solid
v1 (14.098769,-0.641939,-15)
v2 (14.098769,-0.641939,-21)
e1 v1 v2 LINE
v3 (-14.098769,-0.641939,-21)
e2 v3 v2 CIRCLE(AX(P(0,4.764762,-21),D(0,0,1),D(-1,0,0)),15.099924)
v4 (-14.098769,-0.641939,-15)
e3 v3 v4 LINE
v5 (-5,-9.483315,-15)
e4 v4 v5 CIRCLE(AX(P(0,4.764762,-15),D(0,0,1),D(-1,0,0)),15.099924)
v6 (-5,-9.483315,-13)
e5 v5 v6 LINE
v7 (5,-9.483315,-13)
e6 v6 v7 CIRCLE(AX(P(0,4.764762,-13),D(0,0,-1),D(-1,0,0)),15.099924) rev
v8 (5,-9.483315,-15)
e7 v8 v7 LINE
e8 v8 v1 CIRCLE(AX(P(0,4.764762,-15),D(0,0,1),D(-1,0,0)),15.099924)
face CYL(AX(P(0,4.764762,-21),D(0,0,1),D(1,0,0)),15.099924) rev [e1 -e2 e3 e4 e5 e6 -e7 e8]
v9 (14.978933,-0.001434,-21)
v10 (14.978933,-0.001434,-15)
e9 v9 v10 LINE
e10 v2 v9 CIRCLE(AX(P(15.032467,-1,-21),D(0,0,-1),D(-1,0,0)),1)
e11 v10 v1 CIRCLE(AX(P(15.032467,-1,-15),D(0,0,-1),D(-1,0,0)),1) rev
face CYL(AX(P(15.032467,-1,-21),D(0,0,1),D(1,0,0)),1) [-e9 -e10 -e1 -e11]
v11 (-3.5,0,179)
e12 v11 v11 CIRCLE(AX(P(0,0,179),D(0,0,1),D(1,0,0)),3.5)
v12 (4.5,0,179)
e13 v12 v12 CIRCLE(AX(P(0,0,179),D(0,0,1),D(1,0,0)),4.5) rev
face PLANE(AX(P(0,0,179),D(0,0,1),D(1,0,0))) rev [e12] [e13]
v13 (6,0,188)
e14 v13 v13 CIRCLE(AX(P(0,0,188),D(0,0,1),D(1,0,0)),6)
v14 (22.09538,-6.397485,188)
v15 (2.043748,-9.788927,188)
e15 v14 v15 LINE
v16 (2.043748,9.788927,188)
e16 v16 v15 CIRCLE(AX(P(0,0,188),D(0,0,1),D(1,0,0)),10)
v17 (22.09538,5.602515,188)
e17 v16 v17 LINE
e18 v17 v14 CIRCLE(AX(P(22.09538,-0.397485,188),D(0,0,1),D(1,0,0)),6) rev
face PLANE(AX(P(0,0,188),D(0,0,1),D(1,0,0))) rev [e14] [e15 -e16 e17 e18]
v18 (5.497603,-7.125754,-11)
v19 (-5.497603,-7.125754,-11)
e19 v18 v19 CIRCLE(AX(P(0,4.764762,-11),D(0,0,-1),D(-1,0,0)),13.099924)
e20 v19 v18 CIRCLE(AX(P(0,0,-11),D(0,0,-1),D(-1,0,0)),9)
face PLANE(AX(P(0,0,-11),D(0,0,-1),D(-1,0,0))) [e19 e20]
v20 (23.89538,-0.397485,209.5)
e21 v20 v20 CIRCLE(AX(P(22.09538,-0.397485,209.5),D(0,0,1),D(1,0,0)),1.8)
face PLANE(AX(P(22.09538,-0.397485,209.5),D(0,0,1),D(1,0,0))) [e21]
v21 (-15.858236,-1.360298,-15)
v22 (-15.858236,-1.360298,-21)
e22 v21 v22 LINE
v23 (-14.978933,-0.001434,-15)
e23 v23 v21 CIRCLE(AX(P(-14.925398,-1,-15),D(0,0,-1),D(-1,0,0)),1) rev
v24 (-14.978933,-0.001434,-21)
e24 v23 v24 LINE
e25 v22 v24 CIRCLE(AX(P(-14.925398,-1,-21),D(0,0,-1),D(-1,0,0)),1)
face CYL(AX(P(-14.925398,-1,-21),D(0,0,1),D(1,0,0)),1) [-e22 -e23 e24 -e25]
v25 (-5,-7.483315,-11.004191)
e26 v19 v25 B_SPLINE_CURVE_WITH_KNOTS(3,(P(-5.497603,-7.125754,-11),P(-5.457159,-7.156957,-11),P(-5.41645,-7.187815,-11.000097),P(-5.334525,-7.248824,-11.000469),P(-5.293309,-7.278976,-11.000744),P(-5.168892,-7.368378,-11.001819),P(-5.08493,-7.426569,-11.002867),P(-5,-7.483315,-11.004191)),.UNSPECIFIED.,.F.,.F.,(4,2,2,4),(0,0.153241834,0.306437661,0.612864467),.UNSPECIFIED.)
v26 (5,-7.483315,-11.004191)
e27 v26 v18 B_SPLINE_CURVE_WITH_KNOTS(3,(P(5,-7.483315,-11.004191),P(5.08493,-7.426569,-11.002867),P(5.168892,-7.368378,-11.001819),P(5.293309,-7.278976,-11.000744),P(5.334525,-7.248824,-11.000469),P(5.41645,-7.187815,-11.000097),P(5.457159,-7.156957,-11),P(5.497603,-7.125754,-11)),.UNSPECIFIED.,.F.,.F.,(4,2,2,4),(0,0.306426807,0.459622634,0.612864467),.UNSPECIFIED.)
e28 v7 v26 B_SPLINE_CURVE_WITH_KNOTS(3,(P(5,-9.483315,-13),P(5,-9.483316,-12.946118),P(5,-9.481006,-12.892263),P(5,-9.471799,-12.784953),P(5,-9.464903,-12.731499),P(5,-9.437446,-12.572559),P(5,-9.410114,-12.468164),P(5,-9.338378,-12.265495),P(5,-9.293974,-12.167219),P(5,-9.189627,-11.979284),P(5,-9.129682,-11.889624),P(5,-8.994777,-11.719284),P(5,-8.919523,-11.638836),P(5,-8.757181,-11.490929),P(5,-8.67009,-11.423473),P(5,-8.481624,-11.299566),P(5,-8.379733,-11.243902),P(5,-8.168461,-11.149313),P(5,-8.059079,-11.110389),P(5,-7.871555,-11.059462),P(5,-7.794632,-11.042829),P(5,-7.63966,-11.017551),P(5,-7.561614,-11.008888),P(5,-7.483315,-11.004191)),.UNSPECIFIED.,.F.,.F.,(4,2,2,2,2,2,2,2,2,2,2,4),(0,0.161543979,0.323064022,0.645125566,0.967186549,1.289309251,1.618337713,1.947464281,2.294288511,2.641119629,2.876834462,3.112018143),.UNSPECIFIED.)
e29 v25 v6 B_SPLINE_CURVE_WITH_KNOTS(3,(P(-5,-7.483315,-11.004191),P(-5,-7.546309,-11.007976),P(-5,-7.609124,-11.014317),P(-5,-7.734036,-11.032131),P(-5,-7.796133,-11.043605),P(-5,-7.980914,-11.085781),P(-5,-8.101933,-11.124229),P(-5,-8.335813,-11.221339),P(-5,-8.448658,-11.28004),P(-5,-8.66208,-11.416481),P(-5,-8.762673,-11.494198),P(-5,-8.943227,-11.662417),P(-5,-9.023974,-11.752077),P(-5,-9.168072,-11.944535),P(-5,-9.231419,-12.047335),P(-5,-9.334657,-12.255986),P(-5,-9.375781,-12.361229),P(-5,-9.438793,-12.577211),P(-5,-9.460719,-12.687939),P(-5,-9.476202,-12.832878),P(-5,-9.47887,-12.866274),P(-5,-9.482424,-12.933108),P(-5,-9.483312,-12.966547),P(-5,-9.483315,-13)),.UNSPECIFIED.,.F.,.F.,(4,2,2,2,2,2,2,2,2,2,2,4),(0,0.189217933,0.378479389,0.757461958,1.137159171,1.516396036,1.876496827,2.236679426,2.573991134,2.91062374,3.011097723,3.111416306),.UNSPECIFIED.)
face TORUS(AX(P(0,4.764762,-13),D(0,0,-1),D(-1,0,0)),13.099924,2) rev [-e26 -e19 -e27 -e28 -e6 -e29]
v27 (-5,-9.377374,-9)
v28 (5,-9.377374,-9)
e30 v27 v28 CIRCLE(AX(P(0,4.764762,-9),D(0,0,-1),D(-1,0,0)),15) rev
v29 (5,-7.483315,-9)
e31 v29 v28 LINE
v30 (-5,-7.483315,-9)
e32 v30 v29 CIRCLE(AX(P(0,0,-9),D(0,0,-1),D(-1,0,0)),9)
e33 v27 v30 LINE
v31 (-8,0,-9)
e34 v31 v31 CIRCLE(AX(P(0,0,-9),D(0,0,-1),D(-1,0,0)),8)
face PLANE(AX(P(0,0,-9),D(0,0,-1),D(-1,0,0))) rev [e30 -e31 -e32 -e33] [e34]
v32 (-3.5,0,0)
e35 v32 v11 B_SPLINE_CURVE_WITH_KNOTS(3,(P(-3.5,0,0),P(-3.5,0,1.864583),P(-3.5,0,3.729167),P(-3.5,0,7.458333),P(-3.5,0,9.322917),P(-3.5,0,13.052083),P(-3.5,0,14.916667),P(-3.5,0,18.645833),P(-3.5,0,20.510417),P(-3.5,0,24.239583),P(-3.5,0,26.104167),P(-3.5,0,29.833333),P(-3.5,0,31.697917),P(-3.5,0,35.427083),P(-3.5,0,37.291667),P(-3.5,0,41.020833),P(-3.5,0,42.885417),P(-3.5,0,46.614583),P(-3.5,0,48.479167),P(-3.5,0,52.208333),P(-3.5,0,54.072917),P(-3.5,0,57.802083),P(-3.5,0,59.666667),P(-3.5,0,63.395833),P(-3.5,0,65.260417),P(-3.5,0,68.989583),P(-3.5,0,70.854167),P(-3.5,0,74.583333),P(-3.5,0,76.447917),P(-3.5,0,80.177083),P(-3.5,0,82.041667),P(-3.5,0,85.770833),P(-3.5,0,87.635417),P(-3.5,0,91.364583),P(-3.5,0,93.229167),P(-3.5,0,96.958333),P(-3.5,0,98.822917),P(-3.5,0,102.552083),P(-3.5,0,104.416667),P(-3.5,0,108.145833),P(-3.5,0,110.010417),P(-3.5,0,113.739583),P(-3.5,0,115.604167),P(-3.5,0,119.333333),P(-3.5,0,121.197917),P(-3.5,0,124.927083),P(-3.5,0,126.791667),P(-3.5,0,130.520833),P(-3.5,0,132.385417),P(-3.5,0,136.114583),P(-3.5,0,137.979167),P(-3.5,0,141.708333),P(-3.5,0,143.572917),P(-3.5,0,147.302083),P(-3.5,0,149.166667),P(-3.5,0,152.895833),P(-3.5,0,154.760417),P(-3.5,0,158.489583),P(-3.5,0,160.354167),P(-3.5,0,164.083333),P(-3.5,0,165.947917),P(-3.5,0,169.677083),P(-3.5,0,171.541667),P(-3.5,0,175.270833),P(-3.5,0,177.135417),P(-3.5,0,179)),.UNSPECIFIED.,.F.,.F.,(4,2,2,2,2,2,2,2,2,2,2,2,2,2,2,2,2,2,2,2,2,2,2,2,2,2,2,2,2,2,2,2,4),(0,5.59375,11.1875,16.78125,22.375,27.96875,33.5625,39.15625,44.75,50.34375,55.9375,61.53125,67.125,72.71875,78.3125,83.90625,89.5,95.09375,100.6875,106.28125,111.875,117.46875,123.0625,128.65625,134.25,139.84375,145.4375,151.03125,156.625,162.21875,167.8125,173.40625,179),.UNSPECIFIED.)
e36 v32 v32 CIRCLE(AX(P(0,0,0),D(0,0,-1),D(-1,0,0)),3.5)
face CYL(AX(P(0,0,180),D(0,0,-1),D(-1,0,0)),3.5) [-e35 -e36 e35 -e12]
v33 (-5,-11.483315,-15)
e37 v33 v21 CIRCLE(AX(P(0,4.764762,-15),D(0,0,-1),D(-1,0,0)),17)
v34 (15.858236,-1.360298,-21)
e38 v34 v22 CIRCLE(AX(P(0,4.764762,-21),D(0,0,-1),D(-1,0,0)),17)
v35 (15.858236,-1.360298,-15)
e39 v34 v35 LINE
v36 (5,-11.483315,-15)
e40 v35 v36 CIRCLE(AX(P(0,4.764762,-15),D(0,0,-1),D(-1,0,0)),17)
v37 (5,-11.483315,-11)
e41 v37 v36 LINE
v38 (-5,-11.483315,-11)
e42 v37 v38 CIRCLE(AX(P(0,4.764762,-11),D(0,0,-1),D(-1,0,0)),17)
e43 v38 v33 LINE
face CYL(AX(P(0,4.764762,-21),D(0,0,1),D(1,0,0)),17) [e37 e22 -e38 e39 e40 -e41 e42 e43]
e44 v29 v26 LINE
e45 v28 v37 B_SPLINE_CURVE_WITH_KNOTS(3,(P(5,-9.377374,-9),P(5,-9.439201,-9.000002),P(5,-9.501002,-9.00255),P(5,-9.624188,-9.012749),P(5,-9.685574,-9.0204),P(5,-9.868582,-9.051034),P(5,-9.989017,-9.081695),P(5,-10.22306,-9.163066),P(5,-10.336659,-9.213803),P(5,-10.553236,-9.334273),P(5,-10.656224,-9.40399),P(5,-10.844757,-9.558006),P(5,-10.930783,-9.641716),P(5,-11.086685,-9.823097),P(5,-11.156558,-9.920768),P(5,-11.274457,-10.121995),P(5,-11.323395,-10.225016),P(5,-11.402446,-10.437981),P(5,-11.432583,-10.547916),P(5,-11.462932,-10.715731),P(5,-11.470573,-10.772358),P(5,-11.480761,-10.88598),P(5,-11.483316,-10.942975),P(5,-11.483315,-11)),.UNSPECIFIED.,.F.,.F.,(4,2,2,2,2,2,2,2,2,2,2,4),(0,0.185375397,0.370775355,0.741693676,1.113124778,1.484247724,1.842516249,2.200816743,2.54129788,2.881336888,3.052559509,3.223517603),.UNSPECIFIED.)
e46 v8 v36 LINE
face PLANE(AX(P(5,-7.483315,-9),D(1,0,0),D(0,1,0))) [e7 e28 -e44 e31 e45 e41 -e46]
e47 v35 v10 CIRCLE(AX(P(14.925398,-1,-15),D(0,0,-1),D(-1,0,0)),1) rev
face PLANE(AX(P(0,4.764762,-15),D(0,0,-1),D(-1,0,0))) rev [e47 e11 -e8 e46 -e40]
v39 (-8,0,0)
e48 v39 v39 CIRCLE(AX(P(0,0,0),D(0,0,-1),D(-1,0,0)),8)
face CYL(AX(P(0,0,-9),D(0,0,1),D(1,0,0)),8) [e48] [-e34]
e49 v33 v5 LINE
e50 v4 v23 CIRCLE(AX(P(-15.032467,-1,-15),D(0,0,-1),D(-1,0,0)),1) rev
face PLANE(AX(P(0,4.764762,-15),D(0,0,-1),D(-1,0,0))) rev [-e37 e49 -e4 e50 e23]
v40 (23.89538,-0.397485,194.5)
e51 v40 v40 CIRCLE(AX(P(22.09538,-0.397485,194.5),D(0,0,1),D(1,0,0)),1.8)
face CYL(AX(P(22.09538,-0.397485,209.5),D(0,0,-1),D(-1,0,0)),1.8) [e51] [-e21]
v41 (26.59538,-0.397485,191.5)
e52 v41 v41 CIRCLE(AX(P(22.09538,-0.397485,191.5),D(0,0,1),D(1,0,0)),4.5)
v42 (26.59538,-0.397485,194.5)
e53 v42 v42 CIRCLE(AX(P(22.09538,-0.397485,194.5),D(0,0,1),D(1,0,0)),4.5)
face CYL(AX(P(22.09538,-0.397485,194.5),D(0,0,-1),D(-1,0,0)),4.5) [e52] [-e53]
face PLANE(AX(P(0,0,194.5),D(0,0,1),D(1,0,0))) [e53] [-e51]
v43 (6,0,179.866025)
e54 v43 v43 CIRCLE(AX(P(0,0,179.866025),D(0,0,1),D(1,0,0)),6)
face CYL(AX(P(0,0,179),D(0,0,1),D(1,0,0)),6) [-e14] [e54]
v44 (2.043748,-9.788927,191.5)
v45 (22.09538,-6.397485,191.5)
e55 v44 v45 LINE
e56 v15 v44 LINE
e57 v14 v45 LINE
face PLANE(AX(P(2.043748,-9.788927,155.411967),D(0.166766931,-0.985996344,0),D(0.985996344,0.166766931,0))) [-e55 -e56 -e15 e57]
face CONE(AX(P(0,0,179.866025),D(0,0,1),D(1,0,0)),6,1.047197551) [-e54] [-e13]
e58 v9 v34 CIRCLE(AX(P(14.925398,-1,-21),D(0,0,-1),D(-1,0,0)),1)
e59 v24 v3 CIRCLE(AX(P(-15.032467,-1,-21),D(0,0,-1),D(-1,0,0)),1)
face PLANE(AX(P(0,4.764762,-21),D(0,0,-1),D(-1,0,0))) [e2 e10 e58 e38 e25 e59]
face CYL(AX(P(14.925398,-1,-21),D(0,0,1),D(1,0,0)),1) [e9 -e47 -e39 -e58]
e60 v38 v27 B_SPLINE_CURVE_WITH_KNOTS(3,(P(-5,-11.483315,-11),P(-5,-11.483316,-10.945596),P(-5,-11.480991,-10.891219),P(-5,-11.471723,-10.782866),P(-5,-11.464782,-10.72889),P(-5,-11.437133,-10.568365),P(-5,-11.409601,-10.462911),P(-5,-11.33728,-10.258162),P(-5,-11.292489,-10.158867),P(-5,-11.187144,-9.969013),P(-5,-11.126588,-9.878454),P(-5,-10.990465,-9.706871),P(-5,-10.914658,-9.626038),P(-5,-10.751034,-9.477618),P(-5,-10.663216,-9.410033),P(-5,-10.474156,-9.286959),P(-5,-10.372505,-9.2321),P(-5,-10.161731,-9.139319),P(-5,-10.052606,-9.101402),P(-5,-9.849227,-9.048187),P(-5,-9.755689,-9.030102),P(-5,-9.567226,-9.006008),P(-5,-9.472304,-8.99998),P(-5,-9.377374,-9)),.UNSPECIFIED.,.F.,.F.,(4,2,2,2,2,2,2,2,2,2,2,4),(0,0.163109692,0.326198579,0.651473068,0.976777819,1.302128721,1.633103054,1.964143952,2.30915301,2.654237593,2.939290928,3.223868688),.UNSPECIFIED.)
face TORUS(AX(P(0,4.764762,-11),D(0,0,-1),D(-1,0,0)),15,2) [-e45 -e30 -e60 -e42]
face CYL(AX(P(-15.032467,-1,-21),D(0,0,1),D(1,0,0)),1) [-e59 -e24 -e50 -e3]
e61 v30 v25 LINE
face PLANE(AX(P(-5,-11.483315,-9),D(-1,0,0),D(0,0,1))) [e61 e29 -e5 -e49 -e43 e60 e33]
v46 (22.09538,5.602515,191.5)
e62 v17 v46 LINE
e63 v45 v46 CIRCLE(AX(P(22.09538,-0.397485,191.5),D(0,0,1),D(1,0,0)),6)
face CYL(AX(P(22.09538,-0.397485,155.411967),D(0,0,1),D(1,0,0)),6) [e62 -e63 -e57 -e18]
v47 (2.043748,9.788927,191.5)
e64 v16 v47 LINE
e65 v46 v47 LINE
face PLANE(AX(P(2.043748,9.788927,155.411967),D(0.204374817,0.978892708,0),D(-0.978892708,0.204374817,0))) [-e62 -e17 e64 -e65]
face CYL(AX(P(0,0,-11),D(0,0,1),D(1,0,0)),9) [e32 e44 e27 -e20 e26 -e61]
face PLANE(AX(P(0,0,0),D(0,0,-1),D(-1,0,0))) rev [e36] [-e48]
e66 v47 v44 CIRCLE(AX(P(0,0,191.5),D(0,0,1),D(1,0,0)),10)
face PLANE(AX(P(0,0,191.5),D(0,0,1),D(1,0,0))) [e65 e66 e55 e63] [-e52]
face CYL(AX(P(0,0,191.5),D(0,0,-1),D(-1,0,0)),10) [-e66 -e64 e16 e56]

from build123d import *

# Parameters (mm, degrees)
CROQUIS1_R                   = 3.5
SALIENTE_EXTRUIR1_DEPTH      = 180
SALIENTE_EXTRUIR2_DEPTH      = 8
SALIENTE_EXTRUIR2_DEPTH_BACK = 1
CROQUIS2_R                   = 6
CROQUIS3_R                   = 10
SALIENTE_EXTRUIR3_DEPTH      = 3.5
SALIENTE_EXTRUIR4_START      = -3.5
SALIENTE_EXTRUIR4_DEPTH      = 3.5
CHAFL_N1_SIZE                = 1.5
CHAFL_N1_SIZE2               = 0.866025404
CROQUIS5_R                   = 8
SALIENTE_EXTRUIR5_DEPTH      = 9
CROQUIS6_R                   = 9
SALIENTE_EXTRUIR6_DEPTH      = 2
SALIENTE_EXTRUIR7_START      = -2
SALIENTE_EXTRUIR7_DEPTH      = 2
CROQUIS12_R                  = 4.5
SALIENTE_EXTRUIR11_DEPTH     = 3
CROQUIS13_R                  = 1.8
SALIENTE_EXTRUIR12_DEPTH     = 15
CROQUIS18_W                  = 10
CROQUIS18_H                  = 2
SALIENTE_EXTRUIR16_DEPTH     = 4
SALIENTE_EXTRUIR17_DEPTH     = 6
CORTAR_EXTRUIR3_START        = -4
CORTAR_EXTRUIR3_DEPTH        = 4
SALIENTE_EXTRUIR18_START     = 6
SALIENTE_EXTRUIR18_DEPTH     = 6
REDONDEO7_R                  = 2
REDONDEO8_R                  = 1


with BuildPart() as part:
    # Croquis1 → Saliente-Extruir1 (new body)
    with BuildSketch(Plane.XY):
        with Locations(Location((0, 0, 0), (0, 0, 180))):
            Circle(CROQUIS1_R)
    extrude(amount=SALIENTE_EXTRUIR1_DEPTH)

    # Croquis2 → Saliente-Extruir2 (add, two sides: drawn at the far end of the back side and taken through both)
    with BuildSketch(Plane.XY.offset(180).offset(-SALIENTE_EXTRUIR2_DEPTH_BACK)):
        Circle(CROQUIS2_R)
    extrude(amount=SALIENTE_EXTRUIR2_DEPTH + SALIENTE_EXTRUIR2_DEPTH_BACK)

    # Croquis3 → Saliente-Extruir3 (add)
    with BuildSketch(Plane.XY.offset(188)):
        Circle(CROQUIS3_R)
    extrude(amount=SALIENTE_EXTRUIR3_DEPTH)

    # Croquis4 → Saliente-Extruir4 (add)
    with BuildSketch(Plane.XY.offset(191.5).offset(SALIENTE_EXTRUIR4_START)):
        with BuildLine():
            Line((2.043748165, 9.788927083), (22.095380186, 5.602514639))
            ThreePointArc((22.095380186, 5.602514639), (28.095380186, -0.397485361), (22.095380186, -6.397485361))
            Line((22.095380186, -6.397485361), (2.043748165, -9.788927083))
            ThreePointArc((2.043748165, -9.788927083), (10, 0), (2.043748165, 9.788927083))
        make_face()
    extrude(amount=SALIENTE_EXTRUIR4_DEPTH)

    # Chaflán1
    chafl_n1_edges = [part.edges().sort_by_distance(p)[0] for p in [
        (-6, 0, 179),
    ]]
    chafl_n1_side = [part.faces().sort_by_distance(p)[0] for p in [
        (-5.830294373, 0, 179),
    ]]
    chamfer(chafl_n1_edges, length=CHAFL_N1_SIZE, length2=CHAFL_N1_SIZE2, reference=chafl_n1_side[0])

    # Croquis5 → Saliente-Extruir5 (add)
    with BuildSketch(Plane(origin=(0, 0, 0), x_dir=(-1, 0, 0), z_dir=(0, 0, -1))):
        Circle(CROQUIS5_R)
    extrude(amount=SALIENTE_EXTRUIR5_DEPTH)

    # Croquis6 → Saliente-Extruir6 (add)
    with BuildSketch(Plane(origin=(0, 0, -9), x_dir=(-1, 0, 0), z_dir=(0, 0, -1))):
        Circle(CROQUIS6_R)
    extrude(amount=SALIENTE_EXTRUIR6_DEPTH)

    # Croquis7 → Saliente-Extruir7 (add)
    with BuildSketch(Plane(origin=(0, 0, -11), x_dir=(-1, 0, 0), z_dir=(0, 0, -1)).offset(SALIENTE_EXTRUIR7_START)):
        with BuildLine():
            Line((-5, -7.483314774), (-5, -11.483314774))
            Line((-5, -11.483314774), (5, -11.483314774))
            Line((5, -11.483314774), (5, -7.483314774))
            ThreePointArc((5, -7.483314774), (0, -9), (-5, -7.483314774))
        make_face()
    extrude(amount=SALIENTE_EXTRUIR7_DEPTH)

    # Croquis12 → Saliente-Extruir11 (add)
    with BuildSketch(Plane.XY.offset(191.5)):
        with Locations((22.095380186, -0.397485361)):
            Circle(CROQUIS12_R)
    extrude(amount=SALIENTE_EXTRUIR11_DEPTH)

    # Croquis13 → Saliente-Extruir12 (add)
    with BuildSketch(Plane.XY.offset(194.5)):
        with Locations((22.095380186, -0.397485361)):
            Circle(CROQUIS13_R)
    extrude(amount=SALIENTE_EXTRUIR12_DEPTH)

    # Croquis18 → Saliente-Extruir16 (add)
    with BuildSketch(Plane(origin=(0, 0, -11), x_dir=(-1, 0, 0), z_dir=(0, 0, -1))):
        with Locations((0, -10.483314774)):
            Rectangle(CROQUIS18_W, CROQUIS18_H)
    extrude(amount=SALIENTE_EXTRUIR16_DEPTH)

    # Croquis19 → Saliente-Extruir17 (add)
    with BuildSketch(Plane(origin=(0, 0, -15), x_dir=(-1, 0, 0), z_dir=(0, 0, -1))):
        with BuildLine():
            Line((14.328458937, 0), (16.318610319, 0))
            ThreePointArc((16.318610319, 0), (0, -12.235237964), (-16.318610319, 0))
            Line((-16.318610319, 0), (-14.328458937, 0))
            ThreePointArc((-14.328458937, 0), (0, -10.335161566), (14.328458937, 0))
        make_face()
    extrude(amount=SALIENTE_EXTRUIR17_DEPTH)

    # Croquis20 → Cortar-Extruir3 (cut)
    with BuildSketch(Plane(origin=(0, 0, -15), x_dir=(-1, 0, 0), z_dir=(0, 0, -1)).offset(CORTAR_EXTRUIR3_START)):
        with BuildLine():
            Line((5, -9.483314774), (-5, -9.483314774))
            ThreePointArc((-5, -9.483314774), (0, -10.335161566), (5, -9.483314774))
        make_face()
    extrude(amount=CORTAR_EXTRUIR3_DEPTH, mode=Mode.SUBTRACT)

    # Croquis21 → Saliente-Extruir18 (add)
    with BuildSketch(Plane.XY.offset(-15).offset(SALIENTE_EXTRUIR18_START)):
        with BuildLine():
            Line((5, -11.483314774), (-5, -11.483314774))
            ThreePointArc((-5, -11.483314774), (0, -12.235237964), (5, -11.483314774))
        make_face()
    extrude(amount=-SALIENTE_EXTRUIR18_DEPTH)

    # Redondeo7
    redondeo7_edges = [part.edges().sort_by_distance(p)[0] for p in [
        (0, -12.235237964, -9),
        (0, -10.335161566, -11),
    ]]
    fillet(redondeo7_edges, radius=REDONDEO7_R)

    # Redondeo8
    # the kernel refuses this fillet: 1 mm, written as the material it takes off along each edge
    with BuildSketch(Plane(origin=(-16.318610319, 0, -11.409775172), x_dir=(0.3205749609840578, -0.9472231492051225, 0), z_dir=(0, 0, -1))) as redondeo8_piece_1:
        with BuildLine():
            CenterArc((1.393851992, -0.99910758), REDONDEO8_R, 87.579224192, 111.118475452)
            Line((0.446628843, -1.319682541), (0, 0))
            ThreePointArc((0, 0), (0.718044966, 0.015171139), (1.436089931, 0))
        make_face()
    extrude(amount=13.180449656, mode=Mode.SUBTRACT)
    with BuildSketch(Plane(origin=(-14.328458937, 0, -13.239980297), x_dir=(0.3368909660560179, -0.9415436670648064, 0), z_dir=(0, 0, -1))) as redondeo8_piece_2:
        with BuildLine():
            CenterArc((0.704369772, 0.999745128), REDONDEO8_R, 199.687567709, 69.018809156)
            Line((-0.237173895, 0.662854162), (0, 0))
            ThreePointArc((0, 0), (0.340896854, 0.003848545), (0.681793707, 0))
        make_face()
    extrude(amount=9.520039406, mode=Mode.SUBTRACT)
    with BuildSketch(Plane(origin=(16.318610319, 0, -11.409775172), x_dir=(-0.3205749609840585, -0.9472231492051224, 0), z_dir=(0, 0, -1))) as redondeo8_piece_3:
        with BuildLine():
            CenterArc((1.393851992, 0.99910758), REDONDEO8_R, 161.302300356, 111.118475452)
            Line((0.446628843, 1.319682541), (0, 0))
            ThreePointArc((0, 0), (0.718044966, -0.015171139), (1.436089931, 0))
        make_face()
    extrude(amount=13.180449656, mode=Mode.SUBTRACT)
    with BuildSketch(Plane(origin=(14.328458937, 0, -13.239980297), x_dir=(-0.33689096605601593, -0.9415436670648072, 0), z_dir=(0, 0, -1))) as redondeo8_piece_4:
        with BuildLine():
            CenterArc((0.704369772, -0.999745128), REDONDEO8_R, 91.293623135, 69.018809156)
            Line((-0.237173895, -0.662854162), (0, 0))
            ThreePointArc((0, 0), (0.340896854, -0.003848545), (0.681793707, 0))
        make_face()
    extrude(amount=9.520039406, mode=Mode.SUBTRACT)


solid = part.part
